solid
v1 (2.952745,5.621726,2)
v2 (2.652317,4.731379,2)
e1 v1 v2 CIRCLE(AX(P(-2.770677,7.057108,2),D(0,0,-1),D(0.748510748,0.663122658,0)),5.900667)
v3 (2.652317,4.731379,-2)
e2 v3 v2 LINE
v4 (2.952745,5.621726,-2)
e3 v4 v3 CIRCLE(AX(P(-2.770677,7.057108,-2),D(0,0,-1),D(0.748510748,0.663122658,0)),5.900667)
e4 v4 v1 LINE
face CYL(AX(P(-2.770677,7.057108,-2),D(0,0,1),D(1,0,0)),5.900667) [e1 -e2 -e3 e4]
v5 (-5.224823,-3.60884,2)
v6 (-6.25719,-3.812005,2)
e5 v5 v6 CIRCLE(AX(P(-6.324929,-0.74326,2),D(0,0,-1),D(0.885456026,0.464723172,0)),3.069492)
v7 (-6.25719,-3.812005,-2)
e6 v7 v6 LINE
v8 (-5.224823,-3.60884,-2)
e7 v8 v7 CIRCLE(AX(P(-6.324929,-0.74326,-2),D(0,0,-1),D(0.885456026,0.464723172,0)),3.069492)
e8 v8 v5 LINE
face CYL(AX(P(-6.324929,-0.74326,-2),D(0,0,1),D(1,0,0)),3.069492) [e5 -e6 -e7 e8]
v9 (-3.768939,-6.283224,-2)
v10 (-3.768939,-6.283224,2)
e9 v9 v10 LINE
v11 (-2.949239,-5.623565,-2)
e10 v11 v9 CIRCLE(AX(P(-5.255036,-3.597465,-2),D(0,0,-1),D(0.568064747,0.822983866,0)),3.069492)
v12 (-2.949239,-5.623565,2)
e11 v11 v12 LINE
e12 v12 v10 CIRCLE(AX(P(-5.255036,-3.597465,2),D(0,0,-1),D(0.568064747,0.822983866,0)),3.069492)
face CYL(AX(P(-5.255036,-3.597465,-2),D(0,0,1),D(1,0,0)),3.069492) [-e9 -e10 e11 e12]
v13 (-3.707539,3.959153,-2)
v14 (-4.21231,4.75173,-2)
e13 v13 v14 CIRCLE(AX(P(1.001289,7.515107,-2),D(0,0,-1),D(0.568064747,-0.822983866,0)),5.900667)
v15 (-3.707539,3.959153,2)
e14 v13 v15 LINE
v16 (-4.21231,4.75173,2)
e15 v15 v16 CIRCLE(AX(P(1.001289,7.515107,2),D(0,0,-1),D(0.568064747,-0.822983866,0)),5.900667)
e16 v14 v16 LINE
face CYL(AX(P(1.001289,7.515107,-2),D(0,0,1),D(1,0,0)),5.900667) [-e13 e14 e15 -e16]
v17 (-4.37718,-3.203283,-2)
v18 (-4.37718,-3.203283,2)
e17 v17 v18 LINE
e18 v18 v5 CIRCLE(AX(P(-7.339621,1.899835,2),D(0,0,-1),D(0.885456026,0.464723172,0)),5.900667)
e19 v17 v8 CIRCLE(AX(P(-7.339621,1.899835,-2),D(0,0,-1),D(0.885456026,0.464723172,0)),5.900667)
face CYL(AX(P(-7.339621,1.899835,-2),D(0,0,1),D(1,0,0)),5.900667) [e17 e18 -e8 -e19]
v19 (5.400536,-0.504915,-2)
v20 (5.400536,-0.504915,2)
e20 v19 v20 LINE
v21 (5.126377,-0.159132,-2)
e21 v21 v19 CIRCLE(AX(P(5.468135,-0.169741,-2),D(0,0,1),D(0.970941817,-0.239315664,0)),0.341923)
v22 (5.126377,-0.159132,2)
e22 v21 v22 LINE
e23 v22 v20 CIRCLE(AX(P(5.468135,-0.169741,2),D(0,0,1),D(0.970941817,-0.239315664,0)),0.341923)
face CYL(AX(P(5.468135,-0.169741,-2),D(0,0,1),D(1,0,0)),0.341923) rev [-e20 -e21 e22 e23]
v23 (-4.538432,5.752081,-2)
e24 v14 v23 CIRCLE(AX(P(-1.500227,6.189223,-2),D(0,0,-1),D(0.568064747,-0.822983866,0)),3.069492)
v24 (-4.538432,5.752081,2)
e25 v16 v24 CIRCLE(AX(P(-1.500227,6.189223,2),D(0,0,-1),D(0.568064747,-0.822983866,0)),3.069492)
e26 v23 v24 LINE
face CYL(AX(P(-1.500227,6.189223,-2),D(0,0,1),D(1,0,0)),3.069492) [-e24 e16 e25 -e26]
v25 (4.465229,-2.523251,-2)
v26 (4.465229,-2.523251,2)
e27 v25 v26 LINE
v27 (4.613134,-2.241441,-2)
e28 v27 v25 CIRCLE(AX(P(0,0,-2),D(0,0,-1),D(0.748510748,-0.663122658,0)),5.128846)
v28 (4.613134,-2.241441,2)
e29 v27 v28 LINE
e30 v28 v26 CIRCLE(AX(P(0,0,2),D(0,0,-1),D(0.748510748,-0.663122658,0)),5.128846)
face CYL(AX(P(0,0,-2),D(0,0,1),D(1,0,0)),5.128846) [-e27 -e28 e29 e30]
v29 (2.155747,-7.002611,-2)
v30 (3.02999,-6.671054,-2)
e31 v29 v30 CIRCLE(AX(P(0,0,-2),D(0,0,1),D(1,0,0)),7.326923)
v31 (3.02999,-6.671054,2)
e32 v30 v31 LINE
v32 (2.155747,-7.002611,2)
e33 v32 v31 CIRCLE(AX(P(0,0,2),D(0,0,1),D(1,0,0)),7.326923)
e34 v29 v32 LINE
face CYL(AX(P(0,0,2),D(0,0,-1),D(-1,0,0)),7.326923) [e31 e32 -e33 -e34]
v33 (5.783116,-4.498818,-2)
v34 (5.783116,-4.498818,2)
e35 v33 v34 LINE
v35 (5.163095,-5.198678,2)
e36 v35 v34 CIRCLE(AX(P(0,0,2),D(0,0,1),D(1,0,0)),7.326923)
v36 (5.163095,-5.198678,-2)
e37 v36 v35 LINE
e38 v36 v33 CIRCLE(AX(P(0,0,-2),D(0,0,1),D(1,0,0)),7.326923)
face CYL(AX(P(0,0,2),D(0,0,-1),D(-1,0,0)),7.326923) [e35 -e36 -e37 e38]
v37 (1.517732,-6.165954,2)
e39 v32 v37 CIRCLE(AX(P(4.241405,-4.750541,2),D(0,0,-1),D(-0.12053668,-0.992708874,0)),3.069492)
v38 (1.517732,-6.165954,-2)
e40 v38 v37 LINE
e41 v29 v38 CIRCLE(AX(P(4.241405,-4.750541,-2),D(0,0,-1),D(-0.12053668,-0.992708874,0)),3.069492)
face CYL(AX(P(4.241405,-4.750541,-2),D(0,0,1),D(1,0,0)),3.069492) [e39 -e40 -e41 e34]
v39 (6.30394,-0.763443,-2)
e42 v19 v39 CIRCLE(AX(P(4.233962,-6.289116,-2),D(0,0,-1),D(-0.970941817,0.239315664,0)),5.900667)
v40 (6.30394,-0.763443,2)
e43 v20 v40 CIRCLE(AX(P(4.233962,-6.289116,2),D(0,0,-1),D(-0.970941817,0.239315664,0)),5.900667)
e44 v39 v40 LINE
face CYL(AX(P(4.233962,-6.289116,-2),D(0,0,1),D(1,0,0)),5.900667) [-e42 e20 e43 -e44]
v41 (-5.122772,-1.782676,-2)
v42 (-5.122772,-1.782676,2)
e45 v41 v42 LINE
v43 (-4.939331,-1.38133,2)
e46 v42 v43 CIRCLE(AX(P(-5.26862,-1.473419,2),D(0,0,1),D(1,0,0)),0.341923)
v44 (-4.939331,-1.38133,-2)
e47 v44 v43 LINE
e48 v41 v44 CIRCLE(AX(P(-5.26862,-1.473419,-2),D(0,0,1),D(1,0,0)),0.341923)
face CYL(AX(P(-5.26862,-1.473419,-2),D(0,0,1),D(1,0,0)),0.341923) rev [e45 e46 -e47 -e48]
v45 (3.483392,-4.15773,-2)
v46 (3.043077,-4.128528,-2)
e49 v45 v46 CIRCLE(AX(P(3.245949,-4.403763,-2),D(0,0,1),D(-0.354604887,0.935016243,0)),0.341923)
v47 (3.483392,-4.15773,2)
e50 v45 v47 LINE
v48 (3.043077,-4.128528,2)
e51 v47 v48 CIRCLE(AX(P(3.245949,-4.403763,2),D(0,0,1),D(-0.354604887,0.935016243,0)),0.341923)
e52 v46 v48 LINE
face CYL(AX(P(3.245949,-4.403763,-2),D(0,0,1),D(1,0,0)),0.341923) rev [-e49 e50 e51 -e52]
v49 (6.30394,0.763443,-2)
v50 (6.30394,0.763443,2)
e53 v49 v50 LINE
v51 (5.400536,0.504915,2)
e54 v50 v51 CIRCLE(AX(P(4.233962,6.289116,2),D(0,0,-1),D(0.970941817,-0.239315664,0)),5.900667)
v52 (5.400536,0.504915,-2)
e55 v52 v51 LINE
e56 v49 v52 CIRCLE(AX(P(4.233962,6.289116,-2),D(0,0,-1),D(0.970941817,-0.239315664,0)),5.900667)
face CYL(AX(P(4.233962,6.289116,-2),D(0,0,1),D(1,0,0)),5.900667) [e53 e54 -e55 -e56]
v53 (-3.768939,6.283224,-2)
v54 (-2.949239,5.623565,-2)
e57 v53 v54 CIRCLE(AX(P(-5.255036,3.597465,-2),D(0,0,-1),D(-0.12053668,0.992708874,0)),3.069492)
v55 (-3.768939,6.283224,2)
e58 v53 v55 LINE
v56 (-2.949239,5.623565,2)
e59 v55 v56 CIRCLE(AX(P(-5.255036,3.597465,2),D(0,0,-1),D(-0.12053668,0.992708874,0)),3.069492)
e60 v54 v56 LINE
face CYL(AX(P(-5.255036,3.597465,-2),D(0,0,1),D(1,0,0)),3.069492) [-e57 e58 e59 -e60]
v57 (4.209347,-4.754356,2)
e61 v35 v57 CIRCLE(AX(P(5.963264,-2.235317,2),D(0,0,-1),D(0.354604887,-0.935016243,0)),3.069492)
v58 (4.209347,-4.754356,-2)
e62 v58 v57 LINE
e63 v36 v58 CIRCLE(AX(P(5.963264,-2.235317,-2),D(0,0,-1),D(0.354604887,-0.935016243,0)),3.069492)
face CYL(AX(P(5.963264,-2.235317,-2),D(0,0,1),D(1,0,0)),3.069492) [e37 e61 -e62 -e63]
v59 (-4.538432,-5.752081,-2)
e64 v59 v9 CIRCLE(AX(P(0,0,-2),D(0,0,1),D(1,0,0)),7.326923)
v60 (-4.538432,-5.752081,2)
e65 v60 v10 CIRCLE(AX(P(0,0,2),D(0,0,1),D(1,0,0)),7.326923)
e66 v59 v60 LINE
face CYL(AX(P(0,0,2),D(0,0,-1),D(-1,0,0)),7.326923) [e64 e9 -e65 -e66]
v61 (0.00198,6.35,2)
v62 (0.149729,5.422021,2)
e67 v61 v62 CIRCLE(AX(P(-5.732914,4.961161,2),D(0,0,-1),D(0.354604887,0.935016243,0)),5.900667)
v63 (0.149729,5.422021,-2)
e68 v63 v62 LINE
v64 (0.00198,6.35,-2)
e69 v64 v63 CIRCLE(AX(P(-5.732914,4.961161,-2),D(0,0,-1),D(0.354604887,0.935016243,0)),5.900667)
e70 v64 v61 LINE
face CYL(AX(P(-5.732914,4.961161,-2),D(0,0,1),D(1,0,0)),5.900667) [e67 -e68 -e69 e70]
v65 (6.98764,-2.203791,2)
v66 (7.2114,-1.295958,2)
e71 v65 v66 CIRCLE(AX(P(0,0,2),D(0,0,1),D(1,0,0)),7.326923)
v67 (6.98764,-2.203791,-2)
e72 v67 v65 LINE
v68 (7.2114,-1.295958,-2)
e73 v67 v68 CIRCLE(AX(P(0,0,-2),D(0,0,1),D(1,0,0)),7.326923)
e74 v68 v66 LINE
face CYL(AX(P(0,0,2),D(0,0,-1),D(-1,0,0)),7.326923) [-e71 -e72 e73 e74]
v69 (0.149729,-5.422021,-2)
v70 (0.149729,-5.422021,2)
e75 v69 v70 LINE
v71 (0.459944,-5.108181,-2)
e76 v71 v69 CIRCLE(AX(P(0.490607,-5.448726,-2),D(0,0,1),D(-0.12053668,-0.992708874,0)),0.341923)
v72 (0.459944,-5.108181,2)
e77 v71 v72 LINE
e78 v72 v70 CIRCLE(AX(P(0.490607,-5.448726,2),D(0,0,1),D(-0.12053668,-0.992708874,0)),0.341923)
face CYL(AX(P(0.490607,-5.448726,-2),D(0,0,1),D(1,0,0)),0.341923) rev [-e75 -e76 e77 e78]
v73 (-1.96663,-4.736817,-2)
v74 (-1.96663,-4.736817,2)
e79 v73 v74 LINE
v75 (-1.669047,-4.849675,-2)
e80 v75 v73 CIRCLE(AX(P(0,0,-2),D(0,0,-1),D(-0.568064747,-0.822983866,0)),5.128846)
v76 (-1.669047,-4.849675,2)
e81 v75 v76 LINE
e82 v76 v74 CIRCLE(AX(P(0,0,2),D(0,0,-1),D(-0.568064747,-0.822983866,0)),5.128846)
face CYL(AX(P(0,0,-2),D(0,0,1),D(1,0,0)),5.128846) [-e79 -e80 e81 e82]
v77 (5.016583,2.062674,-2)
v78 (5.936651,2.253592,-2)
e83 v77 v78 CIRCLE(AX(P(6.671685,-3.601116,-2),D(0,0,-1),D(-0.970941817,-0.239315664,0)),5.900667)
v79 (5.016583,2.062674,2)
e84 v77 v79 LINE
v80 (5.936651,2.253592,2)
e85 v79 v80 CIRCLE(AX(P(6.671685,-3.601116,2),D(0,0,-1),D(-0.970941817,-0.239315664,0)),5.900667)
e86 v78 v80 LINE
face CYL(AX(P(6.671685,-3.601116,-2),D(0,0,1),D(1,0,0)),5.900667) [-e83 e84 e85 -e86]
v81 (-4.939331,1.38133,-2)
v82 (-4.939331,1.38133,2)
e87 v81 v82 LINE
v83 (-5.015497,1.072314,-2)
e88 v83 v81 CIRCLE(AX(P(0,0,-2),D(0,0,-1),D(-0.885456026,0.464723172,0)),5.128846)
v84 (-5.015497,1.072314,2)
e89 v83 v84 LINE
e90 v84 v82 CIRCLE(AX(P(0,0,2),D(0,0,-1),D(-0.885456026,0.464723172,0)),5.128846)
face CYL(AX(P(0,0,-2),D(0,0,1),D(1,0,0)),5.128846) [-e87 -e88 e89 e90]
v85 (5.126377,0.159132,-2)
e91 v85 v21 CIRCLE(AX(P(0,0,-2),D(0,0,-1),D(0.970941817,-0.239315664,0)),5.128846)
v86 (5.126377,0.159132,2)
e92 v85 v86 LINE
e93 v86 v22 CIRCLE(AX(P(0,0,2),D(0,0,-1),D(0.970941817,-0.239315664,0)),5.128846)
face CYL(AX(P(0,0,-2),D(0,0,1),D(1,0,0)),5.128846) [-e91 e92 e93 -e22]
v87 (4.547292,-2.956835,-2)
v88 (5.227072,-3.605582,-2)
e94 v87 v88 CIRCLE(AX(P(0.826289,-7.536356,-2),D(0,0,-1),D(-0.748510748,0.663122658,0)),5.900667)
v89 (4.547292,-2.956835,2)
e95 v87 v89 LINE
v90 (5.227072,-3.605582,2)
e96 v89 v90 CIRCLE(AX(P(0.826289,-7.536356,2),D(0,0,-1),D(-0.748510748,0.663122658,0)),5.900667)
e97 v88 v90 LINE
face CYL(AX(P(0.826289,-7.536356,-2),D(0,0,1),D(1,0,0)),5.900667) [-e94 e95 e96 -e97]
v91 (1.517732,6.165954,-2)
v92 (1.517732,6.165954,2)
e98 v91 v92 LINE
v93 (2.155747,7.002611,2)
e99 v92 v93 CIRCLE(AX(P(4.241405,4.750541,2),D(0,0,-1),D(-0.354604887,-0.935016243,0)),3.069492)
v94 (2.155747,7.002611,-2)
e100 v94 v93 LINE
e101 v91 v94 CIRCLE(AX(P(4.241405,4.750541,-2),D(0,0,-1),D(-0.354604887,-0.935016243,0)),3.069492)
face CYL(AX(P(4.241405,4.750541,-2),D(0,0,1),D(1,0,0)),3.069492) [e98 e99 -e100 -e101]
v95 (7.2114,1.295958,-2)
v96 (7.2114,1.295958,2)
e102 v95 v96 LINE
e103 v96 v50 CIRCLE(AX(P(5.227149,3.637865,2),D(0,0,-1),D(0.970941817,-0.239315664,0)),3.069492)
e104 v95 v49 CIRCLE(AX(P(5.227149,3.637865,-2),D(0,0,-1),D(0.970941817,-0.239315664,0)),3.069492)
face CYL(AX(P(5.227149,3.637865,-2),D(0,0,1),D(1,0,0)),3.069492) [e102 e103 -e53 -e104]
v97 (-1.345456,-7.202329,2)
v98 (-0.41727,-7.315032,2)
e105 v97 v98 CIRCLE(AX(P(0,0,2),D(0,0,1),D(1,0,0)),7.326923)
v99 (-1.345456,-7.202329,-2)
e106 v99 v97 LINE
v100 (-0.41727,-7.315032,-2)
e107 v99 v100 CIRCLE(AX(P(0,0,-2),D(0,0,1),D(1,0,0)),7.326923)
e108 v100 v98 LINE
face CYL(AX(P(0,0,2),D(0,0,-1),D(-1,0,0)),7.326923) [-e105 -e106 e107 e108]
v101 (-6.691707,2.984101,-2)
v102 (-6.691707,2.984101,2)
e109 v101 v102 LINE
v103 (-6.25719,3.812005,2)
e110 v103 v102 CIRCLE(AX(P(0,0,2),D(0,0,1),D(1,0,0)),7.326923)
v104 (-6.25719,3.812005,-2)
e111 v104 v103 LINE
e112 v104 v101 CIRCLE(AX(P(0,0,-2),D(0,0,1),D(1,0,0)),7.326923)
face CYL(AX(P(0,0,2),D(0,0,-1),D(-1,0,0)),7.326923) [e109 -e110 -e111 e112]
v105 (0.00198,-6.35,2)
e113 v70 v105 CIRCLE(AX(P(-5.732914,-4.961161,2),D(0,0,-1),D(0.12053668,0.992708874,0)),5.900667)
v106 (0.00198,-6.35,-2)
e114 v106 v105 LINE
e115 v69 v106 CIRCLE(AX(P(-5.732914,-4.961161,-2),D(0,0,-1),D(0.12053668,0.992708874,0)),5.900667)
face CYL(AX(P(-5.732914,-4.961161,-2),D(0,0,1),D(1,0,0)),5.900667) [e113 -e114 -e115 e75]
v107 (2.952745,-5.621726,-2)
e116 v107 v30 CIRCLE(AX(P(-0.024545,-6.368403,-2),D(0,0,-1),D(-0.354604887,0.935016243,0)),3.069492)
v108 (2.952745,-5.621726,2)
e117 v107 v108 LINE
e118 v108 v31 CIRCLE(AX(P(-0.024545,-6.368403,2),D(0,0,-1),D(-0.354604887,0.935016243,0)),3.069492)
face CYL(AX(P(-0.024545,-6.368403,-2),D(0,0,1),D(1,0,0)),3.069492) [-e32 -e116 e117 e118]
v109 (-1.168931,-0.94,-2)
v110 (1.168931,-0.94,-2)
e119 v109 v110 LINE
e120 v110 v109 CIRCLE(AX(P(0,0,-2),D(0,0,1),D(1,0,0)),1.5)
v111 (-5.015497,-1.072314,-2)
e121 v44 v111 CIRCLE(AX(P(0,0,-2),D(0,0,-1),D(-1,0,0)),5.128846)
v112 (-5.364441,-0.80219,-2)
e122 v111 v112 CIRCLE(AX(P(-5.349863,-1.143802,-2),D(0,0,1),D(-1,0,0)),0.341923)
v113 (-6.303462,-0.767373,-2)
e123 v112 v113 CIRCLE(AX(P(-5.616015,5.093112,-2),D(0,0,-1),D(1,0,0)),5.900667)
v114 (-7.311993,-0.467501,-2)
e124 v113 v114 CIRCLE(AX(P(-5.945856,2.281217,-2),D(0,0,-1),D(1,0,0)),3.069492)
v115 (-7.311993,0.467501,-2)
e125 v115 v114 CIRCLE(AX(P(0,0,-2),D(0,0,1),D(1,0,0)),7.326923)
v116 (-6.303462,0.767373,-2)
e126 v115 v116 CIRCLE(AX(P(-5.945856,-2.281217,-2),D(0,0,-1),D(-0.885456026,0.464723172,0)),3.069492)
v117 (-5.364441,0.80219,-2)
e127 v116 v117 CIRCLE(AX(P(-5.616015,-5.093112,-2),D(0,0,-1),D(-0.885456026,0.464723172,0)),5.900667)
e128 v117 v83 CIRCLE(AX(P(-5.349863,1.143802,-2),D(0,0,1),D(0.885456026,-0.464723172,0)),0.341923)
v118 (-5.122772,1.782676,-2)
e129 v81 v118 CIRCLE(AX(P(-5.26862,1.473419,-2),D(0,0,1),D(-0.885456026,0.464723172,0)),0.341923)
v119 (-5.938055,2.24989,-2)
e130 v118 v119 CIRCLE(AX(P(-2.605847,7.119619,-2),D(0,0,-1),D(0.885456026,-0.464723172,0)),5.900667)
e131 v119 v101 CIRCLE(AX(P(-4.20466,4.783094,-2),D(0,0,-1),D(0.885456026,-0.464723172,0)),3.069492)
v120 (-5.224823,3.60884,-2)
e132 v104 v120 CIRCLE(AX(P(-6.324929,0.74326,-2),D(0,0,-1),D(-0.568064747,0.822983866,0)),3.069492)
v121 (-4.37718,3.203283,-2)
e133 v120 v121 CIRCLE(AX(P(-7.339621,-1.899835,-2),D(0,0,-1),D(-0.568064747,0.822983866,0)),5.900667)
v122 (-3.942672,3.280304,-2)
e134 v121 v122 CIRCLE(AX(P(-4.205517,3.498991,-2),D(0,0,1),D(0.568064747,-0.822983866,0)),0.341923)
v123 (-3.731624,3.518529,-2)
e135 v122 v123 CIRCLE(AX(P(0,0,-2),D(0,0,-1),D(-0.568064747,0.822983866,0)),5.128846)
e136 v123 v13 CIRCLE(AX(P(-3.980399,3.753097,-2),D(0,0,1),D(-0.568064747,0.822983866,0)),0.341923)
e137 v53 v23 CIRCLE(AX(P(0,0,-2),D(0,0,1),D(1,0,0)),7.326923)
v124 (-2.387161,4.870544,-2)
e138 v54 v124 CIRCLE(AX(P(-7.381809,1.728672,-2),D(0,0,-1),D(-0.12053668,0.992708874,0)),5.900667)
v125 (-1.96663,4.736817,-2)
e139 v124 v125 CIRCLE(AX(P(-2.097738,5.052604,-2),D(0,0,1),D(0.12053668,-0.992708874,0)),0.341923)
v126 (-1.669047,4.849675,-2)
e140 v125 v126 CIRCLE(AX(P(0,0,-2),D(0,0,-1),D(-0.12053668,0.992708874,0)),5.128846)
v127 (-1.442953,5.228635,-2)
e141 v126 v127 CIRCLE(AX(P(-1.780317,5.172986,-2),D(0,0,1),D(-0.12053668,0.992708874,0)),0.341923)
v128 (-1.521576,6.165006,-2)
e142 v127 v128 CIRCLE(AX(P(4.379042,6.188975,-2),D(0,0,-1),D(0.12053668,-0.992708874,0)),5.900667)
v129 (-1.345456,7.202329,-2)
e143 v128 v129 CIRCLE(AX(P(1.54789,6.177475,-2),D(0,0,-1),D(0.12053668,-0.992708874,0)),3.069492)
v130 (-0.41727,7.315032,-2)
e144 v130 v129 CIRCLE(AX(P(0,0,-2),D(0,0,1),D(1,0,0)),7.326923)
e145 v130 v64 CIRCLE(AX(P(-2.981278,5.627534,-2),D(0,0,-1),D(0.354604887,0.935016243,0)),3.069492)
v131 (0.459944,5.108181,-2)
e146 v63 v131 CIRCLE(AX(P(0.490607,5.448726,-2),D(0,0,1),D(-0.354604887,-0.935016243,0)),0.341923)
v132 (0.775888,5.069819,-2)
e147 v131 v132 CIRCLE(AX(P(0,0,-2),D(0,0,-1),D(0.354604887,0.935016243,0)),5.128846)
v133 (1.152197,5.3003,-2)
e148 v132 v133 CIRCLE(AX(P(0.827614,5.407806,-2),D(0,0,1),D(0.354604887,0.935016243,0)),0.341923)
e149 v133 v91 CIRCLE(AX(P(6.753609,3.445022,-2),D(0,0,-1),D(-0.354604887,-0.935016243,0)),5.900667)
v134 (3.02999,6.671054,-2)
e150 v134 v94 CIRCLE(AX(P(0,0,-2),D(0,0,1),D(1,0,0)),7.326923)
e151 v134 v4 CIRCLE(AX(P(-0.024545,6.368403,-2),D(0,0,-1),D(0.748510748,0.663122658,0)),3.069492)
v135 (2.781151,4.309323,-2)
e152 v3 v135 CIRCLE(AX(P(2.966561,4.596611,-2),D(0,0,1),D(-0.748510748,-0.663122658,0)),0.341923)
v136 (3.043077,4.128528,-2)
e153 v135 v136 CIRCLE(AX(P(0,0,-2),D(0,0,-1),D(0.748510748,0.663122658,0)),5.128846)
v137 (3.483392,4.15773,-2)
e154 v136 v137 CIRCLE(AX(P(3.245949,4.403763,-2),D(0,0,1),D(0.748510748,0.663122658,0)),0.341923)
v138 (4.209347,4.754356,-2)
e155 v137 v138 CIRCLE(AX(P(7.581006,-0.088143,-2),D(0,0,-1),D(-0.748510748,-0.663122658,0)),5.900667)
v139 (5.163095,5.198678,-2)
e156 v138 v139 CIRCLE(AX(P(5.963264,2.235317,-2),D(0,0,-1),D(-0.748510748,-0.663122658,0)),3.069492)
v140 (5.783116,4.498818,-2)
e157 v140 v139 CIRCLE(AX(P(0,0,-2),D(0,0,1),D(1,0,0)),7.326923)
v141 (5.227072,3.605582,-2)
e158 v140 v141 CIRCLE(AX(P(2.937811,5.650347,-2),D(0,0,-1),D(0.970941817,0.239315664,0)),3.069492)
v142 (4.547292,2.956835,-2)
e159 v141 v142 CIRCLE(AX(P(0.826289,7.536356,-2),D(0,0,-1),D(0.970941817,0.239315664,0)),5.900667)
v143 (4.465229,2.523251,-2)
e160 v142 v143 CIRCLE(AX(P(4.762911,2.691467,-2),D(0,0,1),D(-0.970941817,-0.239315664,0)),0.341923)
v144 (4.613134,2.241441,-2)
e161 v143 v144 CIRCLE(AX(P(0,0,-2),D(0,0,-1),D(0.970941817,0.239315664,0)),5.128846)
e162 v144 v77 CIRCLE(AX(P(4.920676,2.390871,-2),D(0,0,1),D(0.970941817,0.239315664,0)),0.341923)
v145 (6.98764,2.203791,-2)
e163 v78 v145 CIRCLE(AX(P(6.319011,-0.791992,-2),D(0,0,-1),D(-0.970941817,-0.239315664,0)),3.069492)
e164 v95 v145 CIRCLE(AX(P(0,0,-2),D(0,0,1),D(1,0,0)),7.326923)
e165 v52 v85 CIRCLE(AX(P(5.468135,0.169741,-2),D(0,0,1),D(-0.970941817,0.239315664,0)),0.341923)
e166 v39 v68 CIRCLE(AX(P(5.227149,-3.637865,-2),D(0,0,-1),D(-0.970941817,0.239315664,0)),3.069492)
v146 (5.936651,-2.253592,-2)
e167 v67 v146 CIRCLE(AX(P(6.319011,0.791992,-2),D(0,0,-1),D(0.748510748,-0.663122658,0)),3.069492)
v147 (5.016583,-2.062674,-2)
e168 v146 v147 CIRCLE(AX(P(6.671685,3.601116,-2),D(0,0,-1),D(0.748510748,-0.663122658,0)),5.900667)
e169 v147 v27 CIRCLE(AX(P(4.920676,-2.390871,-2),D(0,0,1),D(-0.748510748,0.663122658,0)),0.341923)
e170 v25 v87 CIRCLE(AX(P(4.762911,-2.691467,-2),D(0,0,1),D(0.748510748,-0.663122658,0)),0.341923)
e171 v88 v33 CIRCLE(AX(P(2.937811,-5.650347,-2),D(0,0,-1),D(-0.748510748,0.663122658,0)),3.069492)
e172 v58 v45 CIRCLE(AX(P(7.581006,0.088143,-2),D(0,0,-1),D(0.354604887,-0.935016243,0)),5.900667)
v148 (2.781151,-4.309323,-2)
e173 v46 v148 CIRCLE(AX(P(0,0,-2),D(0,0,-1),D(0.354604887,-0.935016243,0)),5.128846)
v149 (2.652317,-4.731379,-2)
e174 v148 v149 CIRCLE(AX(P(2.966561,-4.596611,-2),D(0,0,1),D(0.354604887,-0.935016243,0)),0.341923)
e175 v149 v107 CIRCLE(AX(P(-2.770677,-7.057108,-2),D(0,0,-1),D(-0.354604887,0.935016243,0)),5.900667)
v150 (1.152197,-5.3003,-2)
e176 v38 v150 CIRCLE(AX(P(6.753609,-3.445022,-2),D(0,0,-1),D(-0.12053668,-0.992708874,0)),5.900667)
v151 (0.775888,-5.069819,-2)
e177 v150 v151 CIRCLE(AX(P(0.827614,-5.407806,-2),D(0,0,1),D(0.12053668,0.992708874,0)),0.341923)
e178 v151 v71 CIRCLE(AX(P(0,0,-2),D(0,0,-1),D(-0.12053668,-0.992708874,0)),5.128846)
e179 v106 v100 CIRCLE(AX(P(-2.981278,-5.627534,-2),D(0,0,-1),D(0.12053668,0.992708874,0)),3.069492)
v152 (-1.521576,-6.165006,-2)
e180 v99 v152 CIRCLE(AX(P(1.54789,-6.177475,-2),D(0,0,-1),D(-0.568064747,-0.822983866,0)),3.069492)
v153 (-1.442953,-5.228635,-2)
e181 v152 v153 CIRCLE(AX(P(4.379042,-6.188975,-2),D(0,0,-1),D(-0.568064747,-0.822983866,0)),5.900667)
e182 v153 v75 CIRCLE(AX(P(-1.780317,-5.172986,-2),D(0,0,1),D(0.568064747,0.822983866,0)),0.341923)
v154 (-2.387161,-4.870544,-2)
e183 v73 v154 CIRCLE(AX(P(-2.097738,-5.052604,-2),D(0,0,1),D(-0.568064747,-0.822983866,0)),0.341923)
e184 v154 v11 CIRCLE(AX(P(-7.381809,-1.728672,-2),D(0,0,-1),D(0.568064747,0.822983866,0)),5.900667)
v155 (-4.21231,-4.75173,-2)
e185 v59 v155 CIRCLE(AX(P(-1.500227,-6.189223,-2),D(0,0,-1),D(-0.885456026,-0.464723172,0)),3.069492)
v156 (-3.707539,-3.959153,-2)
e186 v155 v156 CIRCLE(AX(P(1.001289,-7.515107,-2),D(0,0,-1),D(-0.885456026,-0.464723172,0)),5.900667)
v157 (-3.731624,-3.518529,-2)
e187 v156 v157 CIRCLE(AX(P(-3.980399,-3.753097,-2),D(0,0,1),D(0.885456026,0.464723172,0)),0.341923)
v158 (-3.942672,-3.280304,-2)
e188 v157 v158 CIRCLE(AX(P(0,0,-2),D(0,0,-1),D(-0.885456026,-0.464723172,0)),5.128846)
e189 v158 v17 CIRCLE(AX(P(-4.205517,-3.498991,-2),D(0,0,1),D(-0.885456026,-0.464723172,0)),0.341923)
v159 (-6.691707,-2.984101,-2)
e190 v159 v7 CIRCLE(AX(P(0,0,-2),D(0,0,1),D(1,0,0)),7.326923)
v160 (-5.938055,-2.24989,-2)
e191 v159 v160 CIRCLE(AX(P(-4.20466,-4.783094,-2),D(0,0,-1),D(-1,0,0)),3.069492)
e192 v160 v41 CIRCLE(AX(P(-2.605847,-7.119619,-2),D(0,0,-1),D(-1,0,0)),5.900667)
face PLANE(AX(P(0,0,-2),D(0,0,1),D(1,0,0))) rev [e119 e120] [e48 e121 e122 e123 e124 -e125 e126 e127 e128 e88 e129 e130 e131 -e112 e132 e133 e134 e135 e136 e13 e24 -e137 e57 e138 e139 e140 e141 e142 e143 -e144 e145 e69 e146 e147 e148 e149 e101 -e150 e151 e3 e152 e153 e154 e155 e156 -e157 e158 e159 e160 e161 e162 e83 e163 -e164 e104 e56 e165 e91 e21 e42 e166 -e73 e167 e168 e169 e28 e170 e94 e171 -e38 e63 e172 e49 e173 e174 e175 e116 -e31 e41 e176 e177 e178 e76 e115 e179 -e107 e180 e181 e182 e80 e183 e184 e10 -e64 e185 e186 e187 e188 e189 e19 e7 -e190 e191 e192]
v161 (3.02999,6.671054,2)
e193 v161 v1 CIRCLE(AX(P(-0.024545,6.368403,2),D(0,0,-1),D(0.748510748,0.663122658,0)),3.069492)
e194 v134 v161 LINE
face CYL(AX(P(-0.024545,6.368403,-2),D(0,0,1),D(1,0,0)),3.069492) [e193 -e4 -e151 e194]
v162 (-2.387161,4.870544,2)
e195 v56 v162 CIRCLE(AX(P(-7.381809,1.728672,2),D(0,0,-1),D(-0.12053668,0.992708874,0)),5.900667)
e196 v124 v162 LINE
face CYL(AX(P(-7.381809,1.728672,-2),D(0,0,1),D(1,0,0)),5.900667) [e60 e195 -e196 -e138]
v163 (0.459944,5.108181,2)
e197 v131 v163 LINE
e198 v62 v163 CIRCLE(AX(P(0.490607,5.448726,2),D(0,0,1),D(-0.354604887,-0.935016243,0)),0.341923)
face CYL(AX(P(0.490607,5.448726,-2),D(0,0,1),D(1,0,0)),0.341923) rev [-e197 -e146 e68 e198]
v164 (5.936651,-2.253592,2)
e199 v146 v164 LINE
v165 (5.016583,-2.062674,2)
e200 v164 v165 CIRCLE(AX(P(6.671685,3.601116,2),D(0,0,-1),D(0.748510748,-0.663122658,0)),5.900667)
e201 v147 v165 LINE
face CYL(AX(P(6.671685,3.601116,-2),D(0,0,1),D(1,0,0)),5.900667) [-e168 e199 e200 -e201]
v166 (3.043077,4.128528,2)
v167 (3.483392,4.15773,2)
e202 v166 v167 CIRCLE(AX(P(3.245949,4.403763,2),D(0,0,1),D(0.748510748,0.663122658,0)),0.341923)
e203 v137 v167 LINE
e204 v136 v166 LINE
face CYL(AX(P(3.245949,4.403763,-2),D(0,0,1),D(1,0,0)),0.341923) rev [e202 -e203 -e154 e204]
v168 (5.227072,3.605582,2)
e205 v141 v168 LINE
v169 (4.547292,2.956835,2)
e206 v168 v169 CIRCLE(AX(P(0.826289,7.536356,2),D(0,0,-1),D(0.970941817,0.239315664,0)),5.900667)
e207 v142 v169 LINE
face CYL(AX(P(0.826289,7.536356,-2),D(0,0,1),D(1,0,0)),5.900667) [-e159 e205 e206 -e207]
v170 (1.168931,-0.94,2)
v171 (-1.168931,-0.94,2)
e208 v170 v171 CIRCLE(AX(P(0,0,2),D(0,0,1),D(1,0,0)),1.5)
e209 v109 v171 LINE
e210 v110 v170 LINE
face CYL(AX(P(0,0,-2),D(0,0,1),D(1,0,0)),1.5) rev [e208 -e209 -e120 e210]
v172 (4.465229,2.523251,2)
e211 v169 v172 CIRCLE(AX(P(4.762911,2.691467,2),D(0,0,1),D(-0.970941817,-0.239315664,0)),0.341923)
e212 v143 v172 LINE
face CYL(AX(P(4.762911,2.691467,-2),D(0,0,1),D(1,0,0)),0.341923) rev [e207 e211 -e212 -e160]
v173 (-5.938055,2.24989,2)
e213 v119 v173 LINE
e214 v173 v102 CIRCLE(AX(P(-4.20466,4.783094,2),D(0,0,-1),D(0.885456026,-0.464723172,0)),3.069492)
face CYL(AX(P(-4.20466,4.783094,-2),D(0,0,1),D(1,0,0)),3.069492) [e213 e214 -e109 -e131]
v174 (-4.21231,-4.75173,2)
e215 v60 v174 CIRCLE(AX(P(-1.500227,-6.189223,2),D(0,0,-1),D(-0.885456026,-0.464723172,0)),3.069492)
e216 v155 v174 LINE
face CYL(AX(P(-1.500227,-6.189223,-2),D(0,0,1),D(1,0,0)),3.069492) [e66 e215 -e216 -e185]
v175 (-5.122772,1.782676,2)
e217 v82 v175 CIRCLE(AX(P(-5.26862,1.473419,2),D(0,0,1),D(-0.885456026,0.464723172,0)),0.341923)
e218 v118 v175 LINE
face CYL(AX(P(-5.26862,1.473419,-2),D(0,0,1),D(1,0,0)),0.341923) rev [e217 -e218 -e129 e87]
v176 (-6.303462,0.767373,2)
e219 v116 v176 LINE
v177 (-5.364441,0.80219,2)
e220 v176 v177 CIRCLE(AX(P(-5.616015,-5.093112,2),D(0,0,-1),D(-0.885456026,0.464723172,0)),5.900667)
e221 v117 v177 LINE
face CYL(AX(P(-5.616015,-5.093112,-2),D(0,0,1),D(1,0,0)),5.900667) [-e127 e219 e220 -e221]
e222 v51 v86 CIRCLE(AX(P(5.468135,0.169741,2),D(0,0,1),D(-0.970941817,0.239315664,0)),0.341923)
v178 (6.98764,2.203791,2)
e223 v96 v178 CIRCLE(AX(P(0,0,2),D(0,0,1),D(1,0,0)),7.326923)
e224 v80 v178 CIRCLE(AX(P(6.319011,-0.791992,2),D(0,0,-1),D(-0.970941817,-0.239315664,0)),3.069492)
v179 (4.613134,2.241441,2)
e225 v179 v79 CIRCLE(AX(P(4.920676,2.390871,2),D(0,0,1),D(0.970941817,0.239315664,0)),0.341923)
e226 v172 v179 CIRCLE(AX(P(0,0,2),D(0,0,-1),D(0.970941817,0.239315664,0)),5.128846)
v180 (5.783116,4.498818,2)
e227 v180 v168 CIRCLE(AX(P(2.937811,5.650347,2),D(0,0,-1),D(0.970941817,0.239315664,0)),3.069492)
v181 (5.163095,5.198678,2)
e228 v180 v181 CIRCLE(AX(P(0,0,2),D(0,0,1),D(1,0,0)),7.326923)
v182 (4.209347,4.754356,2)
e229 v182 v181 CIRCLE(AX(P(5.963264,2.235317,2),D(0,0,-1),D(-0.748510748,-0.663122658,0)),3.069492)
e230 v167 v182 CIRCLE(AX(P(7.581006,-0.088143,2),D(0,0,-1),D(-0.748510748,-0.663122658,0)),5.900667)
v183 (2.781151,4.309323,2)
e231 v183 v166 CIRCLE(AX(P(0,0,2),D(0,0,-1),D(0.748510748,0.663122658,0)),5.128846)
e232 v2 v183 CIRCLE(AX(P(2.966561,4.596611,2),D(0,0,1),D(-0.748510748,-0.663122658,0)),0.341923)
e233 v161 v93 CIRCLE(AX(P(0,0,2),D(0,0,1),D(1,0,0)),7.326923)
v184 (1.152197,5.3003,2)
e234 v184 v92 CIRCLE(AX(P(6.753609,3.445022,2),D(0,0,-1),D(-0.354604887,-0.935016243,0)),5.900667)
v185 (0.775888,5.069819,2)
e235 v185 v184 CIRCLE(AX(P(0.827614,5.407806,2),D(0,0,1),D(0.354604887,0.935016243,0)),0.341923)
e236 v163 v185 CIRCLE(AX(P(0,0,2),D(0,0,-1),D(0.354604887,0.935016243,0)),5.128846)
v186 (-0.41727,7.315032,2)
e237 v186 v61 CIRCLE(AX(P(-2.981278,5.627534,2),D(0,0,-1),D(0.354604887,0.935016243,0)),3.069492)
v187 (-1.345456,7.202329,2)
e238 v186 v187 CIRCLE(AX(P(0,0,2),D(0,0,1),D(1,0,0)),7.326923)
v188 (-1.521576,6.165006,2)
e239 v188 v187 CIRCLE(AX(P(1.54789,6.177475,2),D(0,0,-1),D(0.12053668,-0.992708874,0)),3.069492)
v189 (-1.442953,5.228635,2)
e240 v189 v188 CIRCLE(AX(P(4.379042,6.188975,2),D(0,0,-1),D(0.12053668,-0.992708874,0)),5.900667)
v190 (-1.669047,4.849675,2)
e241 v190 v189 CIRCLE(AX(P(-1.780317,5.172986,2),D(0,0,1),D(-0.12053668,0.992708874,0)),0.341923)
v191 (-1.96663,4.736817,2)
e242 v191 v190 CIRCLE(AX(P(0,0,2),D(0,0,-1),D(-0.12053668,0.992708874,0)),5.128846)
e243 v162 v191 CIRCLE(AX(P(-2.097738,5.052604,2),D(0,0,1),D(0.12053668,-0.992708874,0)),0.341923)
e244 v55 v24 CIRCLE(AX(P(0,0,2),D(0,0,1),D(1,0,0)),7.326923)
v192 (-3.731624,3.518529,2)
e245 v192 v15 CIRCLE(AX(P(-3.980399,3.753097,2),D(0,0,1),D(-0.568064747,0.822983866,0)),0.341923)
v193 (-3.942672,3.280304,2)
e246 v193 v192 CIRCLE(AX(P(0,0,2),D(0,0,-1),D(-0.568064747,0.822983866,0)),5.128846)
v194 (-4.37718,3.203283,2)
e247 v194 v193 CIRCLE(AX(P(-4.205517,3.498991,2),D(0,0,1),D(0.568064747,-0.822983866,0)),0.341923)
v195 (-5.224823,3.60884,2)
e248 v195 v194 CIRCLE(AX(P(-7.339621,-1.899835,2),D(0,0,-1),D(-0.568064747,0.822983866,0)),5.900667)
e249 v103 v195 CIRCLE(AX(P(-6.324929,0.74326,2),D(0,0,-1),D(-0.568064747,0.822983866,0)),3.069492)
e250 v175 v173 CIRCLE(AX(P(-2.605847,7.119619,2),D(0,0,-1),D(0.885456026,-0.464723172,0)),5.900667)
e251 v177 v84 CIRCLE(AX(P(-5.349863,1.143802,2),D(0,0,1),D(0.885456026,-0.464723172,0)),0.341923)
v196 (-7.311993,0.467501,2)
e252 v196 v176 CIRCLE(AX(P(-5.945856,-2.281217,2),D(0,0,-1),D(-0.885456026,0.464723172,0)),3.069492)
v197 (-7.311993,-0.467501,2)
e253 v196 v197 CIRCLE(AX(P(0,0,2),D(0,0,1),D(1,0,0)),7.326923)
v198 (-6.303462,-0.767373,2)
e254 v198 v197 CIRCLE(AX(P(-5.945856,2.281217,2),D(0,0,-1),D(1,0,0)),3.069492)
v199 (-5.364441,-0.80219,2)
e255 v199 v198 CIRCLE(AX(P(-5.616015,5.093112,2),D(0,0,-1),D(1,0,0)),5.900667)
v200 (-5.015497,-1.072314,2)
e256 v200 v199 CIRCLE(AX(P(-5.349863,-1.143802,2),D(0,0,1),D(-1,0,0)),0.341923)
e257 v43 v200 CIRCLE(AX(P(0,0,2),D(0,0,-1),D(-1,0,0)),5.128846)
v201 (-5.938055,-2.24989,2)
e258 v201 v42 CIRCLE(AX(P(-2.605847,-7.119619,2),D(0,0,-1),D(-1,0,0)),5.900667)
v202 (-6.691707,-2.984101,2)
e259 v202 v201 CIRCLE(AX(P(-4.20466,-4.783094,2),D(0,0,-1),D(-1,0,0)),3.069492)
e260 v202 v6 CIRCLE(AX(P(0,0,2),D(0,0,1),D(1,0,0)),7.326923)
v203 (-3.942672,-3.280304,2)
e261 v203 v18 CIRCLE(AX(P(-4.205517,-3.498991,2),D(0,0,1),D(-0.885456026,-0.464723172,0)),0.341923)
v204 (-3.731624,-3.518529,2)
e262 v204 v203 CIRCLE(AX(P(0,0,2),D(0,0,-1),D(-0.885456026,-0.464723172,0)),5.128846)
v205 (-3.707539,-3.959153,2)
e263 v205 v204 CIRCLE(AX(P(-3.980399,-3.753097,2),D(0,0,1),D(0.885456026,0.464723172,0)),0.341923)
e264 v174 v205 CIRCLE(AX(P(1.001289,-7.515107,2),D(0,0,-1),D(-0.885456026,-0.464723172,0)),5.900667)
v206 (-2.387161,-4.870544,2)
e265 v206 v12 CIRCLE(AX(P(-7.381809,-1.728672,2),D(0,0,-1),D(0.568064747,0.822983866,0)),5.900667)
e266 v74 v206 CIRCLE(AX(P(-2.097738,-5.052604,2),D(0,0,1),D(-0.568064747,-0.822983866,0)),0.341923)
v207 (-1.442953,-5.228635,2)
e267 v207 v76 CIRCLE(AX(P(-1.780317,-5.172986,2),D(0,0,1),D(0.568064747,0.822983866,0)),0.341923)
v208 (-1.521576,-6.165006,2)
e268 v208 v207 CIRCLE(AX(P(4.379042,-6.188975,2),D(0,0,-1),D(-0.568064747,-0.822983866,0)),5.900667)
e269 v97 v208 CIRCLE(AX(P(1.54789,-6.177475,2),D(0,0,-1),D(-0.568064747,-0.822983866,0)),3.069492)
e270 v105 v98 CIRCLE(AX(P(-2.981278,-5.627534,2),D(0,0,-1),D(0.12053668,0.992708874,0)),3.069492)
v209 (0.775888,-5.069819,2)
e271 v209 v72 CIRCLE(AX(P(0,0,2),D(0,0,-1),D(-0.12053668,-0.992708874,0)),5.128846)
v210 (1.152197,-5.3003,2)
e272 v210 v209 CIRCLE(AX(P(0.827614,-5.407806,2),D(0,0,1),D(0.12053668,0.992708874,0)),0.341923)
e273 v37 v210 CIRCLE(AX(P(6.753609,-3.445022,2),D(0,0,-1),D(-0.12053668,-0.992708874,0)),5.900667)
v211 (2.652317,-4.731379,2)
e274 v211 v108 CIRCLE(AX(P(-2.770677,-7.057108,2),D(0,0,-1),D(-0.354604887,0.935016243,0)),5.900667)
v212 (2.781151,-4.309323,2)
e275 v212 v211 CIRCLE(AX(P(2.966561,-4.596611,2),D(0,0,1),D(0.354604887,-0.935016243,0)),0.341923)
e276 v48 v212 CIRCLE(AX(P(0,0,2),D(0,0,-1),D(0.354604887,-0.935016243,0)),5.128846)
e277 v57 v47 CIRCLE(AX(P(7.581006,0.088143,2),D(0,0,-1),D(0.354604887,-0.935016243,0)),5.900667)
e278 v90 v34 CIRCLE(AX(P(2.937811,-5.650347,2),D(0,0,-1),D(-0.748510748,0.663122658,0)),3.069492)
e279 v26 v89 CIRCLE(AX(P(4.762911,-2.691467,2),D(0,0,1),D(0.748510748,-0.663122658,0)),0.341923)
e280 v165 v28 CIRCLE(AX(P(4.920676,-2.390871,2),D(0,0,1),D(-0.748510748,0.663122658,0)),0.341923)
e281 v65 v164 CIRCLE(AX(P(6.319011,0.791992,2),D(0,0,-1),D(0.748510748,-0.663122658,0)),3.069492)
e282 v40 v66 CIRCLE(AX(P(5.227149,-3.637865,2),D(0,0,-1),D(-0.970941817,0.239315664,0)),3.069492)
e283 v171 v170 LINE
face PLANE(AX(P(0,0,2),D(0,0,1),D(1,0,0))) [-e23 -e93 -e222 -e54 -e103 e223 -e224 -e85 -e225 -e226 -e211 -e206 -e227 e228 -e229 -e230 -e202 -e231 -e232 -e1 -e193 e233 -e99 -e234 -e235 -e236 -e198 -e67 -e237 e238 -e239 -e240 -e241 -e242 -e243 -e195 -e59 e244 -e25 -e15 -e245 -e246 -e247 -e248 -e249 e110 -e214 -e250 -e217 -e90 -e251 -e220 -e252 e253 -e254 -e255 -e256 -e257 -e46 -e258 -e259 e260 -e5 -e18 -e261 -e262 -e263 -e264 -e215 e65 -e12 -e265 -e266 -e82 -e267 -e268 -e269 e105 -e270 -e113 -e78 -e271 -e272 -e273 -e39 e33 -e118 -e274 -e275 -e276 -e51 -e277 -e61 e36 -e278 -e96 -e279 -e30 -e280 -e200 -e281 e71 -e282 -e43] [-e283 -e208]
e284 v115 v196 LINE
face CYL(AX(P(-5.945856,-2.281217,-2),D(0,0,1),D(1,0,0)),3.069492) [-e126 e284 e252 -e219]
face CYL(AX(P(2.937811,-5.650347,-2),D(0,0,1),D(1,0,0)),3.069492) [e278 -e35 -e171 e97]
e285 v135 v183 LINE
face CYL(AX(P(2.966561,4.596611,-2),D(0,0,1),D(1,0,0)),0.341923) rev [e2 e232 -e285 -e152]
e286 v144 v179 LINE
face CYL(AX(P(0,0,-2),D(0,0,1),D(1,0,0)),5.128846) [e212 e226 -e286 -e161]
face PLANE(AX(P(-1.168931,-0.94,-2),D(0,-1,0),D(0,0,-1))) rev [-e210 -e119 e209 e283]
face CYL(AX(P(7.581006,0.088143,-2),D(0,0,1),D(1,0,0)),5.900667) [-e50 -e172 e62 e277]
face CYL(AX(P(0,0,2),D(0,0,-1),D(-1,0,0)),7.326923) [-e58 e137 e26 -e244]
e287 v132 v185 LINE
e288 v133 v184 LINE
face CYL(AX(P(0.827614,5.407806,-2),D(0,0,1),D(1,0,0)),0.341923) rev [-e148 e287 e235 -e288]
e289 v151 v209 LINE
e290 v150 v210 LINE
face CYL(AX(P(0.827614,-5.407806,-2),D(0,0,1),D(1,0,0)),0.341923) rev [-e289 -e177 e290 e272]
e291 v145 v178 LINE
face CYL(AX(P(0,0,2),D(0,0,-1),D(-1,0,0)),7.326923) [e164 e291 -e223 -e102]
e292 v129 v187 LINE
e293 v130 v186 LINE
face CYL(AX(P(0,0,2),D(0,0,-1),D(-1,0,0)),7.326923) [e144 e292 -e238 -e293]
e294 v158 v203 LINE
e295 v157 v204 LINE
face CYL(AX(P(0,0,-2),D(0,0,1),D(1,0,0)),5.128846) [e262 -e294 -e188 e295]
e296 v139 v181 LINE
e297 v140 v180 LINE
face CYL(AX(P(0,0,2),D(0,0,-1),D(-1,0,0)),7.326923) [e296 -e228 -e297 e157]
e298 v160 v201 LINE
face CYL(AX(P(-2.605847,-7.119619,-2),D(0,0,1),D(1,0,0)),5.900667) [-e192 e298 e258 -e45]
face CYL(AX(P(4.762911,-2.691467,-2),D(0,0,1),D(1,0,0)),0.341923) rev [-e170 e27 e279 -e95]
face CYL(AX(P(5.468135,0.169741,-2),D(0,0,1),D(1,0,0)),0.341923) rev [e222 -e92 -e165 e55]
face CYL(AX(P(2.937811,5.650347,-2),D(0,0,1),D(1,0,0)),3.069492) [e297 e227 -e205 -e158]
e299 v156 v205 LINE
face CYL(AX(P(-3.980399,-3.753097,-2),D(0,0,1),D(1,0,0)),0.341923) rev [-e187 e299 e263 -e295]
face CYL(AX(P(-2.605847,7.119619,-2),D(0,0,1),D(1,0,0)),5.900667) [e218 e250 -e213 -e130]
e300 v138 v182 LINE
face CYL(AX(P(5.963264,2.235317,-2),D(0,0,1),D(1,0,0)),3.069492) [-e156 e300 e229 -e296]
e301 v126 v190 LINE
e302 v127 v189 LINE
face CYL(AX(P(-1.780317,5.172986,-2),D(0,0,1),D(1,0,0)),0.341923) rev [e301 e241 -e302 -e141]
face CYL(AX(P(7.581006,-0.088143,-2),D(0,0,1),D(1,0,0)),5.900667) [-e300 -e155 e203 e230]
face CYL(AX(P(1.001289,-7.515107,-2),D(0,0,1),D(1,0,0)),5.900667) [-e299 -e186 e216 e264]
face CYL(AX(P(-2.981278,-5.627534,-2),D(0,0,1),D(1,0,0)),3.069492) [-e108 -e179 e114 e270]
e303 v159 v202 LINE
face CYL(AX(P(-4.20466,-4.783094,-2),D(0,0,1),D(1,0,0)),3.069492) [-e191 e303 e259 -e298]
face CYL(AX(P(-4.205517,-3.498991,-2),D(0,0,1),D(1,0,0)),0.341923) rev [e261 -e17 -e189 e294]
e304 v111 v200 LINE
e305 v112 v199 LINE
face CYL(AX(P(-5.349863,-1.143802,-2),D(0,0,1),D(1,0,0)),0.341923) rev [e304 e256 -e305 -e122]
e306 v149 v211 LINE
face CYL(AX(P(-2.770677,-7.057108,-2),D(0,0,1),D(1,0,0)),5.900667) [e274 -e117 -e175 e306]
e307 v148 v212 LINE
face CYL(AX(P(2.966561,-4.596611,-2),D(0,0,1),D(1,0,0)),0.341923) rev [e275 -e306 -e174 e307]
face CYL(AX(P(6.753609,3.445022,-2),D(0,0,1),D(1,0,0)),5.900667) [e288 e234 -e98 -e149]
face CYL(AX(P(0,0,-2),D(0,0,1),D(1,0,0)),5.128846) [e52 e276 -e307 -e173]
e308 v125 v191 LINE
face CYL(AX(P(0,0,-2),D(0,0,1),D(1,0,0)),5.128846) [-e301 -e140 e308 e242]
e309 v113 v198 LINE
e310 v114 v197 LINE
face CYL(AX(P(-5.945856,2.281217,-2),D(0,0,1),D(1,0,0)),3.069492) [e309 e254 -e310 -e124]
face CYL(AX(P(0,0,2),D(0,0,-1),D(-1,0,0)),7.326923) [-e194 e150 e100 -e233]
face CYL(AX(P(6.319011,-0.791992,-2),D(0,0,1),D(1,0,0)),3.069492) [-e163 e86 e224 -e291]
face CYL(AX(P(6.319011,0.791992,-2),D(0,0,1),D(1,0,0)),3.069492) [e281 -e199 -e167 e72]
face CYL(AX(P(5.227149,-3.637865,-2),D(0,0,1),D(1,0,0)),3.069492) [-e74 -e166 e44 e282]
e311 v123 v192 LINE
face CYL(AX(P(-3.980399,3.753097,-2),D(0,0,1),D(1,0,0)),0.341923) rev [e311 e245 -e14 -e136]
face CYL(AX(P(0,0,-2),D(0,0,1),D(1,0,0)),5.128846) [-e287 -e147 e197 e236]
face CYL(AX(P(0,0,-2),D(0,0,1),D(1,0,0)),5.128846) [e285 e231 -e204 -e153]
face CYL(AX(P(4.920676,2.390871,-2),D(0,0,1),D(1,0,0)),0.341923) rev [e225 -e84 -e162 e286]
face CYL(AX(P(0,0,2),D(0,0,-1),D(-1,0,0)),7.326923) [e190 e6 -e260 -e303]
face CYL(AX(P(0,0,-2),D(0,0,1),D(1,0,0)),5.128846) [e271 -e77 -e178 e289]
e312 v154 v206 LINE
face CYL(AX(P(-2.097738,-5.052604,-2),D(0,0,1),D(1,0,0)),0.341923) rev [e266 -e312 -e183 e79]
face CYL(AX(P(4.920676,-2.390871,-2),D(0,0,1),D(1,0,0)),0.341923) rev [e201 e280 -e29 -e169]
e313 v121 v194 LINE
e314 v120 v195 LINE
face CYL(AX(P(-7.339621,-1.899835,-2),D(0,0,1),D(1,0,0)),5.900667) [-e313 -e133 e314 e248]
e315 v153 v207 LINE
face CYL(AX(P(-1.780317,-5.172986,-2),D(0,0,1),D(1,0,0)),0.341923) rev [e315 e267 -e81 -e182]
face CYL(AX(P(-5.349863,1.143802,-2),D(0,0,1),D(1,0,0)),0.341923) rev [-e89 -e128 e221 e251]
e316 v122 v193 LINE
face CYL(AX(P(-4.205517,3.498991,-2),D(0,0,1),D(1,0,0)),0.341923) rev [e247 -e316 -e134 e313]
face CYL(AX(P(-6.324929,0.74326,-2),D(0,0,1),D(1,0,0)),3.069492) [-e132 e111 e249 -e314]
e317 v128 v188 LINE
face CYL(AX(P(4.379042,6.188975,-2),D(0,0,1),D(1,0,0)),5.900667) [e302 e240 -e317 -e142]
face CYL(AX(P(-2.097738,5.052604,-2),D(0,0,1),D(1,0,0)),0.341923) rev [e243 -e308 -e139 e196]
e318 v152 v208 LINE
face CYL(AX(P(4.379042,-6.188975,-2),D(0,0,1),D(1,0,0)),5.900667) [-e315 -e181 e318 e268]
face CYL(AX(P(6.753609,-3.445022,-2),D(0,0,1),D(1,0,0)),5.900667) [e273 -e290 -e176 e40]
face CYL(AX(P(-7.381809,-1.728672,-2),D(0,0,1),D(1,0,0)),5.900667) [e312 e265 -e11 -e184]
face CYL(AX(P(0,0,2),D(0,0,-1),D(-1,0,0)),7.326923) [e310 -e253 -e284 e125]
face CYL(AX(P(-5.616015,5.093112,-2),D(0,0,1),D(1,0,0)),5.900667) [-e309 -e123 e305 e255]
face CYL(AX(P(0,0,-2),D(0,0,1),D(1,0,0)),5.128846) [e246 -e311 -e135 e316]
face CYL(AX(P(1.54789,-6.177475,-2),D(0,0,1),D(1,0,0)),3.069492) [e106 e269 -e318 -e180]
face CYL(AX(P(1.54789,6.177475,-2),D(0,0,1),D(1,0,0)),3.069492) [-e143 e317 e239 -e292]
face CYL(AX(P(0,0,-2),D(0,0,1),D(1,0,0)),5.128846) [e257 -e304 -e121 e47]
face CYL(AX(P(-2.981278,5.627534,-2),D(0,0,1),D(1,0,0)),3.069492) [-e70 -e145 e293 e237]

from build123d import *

# Parameters (mm, degrees)
SKETCH1_R                = 7.326923077
BLANK_DISK_DEPTH         = 2.000000064
GEAR_TOOTH_CUT_DEPTH     = 12.107097036
GEAR_TEETH_REVOLVE_COUNT = 13
SKETCH4_R                = 0.75
HUB_EXTRUDE_DEPTH        = 0.635
HEX_BORE_CUT_DEPTH       = 12.099256277
HEX_BORE_CUT_DEPTH_BACK  = 12.099256277


with BuildPart() as part:
    # Sketch1 → BLANK DISK (new, symmetric)
    with BuildSketch(Plane.XY):
        Circle(SKETCH1_R)
    extrude(amount=BLANK_DISK_DEPTH, both=True)

    # Sketch2 → GEAR TOOTH CUT (cut, through all)
    with BuildSketch(Plane.XY.offset(2.000000064)):
        with BuildLine():
            ThreePointArc((-6.69170719, -2.984100644), (-7.114016008, -1.753447463), (-7.311993171, -0.467501495))
            ThreePointArc((-7.311993171, -0.467501495), (-6.820672406, -0.660972702), (-6.303462426, -0.767373077))
            ThreePointArc((-6.303462426, -0.767373077), (-5.834645763, -0.80350314), (-5.364440786, -0.802189535))
            ThreePointArc((-5.364440786, -0.802189535), (-5.140559328, -0.873425337), (-5.015496519, -1.072314102))
            ThreePointArc((-5.015496519, -1.072314102), (-4.979811206, -1.227413224), (-4.939330826, -1.381330469))
            ThreePointArc((-4.939330826, -1.381330469), (-4.957640225, -1.615557309), (-5.122772484, -1.782676381))
            ThreePointArc((-5.122772484, -1.782676381), (-5.539728776, -2.000028389), (-5.938054838, -2.249889939))
            ThreePointArc((-5.938054838, -2.249889939), (-6.346574811, -2.584462254), (-6.69170719, -2.984100644))
        make_face()
    gear_tooth_cut = extrude(amount=-GEAR_TOOTH_CUT_DEPTH, mode=Mode.SUBTRACT)

    # GEAR TEETH REVOLVE: GEAR TOOTH CUT ×13 about axis
    gear_teeth_revolve_axis = Axis((0, 0, 50), (0, 0, -1))
    for i in range(1, GEAR_TEETH_REVOLVE_COUNT):
        add(gear_tooth_cut.rotate(gear_teeth_revolve_axis, i * 360 / GEAR_TEETH_REVOLVE_COUNT), mode=Mode.SUBTRACT)

    # Sketch4 → Hub Extrude (add)
    with BuildSketch(Plane.XY.offset(2.000000064)):
        Circle(SKETCH4_R)
    extrude(amount=HUB_EXTRUDE_DEPTH)

    # Sketch3 → HEX BORE CUT (cut, two sides: drawn at the far end of the back side and taken through both)
    with BuildSketch(Plane.XY.offset(2.000000064).offset(-HEX_BORE_CUT_DEPTH_BACK)):
        with BuildLine():
            Line((-1.168931136, -0.94), (1.168931136, -0.94))
            ThreePointArc((1.168931136, -0.94), (0, 1.5), (-1.168931136, -0.94))
        make_face()
    extrude(amount=HEX_BORE_CUT_DEPTH + HEX_BORE_CUT_DEPTH_BACK, mode=Mode.SUBTRACT)


solid = part.part
